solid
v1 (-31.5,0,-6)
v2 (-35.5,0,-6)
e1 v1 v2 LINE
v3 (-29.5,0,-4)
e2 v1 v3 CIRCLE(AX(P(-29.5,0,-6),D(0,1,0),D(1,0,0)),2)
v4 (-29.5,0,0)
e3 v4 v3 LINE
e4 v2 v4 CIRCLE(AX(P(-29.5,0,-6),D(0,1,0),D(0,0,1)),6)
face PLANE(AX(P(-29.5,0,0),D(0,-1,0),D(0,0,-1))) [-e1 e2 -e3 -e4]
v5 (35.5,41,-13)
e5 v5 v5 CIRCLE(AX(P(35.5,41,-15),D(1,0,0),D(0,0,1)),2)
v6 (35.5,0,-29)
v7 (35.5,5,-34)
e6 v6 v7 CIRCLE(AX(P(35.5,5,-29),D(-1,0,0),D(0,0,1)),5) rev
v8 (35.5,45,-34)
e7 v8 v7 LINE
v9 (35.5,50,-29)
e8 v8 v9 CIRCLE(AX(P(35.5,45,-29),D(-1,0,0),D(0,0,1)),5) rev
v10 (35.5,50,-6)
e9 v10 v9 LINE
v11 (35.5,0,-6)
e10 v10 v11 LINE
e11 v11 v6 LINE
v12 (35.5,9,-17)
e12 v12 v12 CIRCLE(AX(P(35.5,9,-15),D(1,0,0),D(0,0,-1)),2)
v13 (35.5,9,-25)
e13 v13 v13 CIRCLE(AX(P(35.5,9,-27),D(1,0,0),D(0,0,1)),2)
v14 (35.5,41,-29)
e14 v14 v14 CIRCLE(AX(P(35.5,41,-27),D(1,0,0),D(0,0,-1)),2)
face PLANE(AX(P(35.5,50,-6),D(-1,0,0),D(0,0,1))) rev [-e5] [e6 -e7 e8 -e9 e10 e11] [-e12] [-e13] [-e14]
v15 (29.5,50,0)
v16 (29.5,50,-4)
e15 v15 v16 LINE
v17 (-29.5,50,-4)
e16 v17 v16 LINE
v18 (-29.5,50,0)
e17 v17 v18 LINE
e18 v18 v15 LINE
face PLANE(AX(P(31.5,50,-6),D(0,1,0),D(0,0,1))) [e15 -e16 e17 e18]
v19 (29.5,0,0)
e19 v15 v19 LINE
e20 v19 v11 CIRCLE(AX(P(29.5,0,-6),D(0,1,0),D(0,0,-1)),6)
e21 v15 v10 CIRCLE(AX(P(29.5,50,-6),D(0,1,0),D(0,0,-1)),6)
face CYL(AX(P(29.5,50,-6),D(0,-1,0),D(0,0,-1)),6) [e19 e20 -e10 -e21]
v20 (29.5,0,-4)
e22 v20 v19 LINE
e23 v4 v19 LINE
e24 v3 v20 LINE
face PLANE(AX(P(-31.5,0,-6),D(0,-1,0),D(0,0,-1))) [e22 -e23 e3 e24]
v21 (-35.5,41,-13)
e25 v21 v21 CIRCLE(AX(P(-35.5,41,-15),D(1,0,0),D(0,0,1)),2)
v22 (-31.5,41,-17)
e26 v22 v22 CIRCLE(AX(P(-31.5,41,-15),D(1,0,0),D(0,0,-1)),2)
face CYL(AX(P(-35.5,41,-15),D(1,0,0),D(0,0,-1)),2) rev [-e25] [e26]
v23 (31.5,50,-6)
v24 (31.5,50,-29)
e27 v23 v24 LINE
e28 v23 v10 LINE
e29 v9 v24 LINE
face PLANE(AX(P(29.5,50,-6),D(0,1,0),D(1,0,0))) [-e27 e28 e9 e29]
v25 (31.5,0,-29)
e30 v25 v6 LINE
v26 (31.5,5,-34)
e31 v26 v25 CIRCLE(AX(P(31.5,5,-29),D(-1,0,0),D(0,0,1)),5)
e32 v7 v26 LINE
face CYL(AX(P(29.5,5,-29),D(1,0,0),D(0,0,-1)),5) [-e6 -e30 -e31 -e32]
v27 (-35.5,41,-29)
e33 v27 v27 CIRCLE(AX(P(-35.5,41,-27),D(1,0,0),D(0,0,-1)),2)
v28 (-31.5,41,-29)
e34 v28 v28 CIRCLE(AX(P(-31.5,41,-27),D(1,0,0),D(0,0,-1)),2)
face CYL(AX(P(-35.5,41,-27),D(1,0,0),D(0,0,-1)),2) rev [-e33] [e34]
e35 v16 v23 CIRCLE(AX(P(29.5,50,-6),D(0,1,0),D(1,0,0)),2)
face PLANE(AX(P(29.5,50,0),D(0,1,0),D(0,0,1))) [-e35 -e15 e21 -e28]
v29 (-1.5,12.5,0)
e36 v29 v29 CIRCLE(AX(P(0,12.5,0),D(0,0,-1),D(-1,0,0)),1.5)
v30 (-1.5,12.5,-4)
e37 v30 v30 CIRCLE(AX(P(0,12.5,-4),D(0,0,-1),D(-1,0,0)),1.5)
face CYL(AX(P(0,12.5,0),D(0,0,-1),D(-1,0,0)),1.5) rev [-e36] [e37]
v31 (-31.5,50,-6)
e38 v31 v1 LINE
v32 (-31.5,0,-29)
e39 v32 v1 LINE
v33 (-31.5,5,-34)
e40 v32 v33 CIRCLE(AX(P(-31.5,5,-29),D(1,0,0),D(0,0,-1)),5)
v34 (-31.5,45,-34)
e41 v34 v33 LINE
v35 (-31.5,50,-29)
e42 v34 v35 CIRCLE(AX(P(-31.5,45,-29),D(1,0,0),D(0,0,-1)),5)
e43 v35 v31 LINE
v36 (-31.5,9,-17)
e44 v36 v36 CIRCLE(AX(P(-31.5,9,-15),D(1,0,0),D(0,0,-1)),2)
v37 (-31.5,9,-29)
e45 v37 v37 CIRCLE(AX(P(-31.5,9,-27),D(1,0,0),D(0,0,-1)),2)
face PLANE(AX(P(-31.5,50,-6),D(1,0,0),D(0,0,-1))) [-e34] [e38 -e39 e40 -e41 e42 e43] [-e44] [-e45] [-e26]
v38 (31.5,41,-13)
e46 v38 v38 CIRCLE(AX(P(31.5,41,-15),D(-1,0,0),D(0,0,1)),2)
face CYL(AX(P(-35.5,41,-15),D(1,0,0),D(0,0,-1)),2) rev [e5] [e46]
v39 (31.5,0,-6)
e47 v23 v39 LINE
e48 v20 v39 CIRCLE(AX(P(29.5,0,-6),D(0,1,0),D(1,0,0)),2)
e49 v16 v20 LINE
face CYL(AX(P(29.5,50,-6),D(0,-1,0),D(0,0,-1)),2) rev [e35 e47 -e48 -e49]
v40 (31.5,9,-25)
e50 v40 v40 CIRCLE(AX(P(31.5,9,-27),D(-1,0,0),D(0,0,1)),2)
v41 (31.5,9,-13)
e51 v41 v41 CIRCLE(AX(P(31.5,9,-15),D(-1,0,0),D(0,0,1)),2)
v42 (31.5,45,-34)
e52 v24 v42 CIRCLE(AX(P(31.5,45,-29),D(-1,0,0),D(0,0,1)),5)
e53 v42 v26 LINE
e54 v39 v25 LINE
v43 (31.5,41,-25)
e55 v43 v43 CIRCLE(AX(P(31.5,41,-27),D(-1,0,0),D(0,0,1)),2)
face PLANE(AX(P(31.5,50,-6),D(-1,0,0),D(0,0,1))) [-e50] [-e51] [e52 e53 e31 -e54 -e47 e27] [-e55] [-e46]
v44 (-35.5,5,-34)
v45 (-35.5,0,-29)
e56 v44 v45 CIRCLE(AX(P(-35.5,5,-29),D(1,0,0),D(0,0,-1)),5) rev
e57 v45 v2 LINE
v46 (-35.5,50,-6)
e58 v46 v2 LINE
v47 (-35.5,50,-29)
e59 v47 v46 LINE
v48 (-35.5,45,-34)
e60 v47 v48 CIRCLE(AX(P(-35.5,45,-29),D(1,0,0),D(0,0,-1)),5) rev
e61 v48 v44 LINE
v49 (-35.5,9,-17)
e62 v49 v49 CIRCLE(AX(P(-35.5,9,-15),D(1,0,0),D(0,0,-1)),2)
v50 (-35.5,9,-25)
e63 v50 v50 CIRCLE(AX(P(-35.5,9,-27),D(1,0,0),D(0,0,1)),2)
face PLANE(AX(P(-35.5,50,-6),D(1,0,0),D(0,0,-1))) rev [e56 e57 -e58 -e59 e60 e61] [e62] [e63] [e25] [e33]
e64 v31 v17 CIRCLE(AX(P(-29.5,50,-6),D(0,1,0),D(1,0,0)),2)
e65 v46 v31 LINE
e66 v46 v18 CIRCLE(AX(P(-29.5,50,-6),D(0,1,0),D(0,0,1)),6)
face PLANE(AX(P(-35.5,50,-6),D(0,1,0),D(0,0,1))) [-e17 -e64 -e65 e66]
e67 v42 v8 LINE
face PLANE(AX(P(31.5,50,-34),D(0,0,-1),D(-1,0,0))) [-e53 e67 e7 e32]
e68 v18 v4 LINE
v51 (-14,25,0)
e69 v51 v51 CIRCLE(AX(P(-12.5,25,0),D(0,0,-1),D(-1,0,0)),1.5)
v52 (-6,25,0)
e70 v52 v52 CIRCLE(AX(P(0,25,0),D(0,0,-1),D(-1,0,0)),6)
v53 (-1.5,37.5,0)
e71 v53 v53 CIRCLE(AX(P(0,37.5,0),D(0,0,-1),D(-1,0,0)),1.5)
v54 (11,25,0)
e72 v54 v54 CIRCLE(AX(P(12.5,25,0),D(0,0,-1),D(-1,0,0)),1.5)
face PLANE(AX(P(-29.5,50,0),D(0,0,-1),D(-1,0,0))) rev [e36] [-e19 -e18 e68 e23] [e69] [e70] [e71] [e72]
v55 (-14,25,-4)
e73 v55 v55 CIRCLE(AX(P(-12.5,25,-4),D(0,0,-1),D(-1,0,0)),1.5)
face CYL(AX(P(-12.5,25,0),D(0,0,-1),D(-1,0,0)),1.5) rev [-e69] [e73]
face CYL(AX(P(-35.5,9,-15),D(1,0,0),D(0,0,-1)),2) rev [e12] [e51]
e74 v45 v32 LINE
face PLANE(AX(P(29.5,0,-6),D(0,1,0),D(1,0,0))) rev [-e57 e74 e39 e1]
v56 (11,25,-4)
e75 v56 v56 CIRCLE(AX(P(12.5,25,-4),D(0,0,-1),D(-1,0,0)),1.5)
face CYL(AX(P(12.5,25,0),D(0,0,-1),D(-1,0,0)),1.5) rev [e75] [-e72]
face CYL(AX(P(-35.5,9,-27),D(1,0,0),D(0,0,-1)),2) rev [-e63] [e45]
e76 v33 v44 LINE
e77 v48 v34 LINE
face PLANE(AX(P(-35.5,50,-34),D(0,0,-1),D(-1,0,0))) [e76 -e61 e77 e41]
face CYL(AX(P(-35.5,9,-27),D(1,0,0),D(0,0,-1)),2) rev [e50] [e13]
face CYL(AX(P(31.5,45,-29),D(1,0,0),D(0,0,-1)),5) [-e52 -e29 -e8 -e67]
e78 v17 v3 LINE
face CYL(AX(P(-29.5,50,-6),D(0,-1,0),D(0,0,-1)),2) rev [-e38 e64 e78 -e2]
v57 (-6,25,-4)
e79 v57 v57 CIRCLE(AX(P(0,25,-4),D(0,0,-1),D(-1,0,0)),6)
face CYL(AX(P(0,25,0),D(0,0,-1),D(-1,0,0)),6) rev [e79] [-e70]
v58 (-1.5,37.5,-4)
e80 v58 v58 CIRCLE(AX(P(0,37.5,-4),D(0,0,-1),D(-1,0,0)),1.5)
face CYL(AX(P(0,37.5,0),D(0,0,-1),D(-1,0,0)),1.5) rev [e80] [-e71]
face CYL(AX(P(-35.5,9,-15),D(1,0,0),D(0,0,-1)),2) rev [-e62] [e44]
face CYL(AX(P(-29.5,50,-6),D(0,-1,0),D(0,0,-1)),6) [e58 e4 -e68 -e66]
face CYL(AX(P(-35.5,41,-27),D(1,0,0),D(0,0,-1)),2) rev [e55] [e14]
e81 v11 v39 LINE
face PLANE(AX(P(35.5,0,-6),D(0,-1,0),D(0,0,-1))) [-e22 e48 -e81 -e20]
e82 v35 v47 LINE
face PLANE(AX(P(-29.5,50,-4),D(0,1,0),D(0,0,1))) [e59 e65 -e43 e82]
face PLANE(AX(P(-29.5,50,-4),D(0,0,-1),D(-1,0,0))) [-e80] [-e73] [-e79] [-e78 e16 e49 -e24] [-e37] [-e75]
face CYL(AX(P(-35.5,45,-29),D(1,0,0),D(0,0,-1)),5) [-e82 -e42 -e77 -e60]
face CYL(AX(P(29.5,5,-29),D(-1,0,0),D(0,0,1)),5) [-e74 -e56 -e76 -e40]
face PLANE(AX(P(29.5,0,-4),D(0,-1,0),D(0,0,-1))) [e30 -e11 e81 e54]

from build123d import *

# Parameters (mm, degrees)
SM_BASE_FLANGE_3_DEPTH = 50
SKETCH_14_R            = 6
SKETCH_14_R_2          = 1.5
CUT_EXTRUDE_1_DEPTH    = 69.26602376
SKETCH_15_R            = 2
CUT_EXTRUDE_2_DEPTH    = 94.257707456
FILLET_1_R             = 5


# Sheet-metal steps are written as plain solids
with BuildPart() as part:
    # 草图1 → 基体-法兰3 (new body)
    with BuildSketch(Plane(origin=(0, 0, 0), x_dir=(1, 0, 0), z_dir=(0, 1, 0))):
        with BuildLine():
            Line((-35.5, 34), (-35.5, 6))
            ThreePointArc((-35.5, 6), (-33.742640687, 1.757359313), (-29.5, 0))
            Line((-29.5, 0), (29.5, 0))
            ThreePointArc((29.5, 0), (33.742640687, 1.757359313), (35.5, 6))
            Line((35.5, 6), (35.5, 34))
            Line((35.5, 34), (31.5, 34))
            Line((31.5, 34), (31.5, 6))
            ThreePointArc((31.5, 6), (30.914213562, 4.585786438), (29.5, 4))
            Line((29.5, 4), (-29.5, 4))
            ThreePointArc((-29.5, 4), (-30.914213562, 4.585786438), (-31.5, 6))
            Line((-31.5, 6), (-31.5, 34))
            Line((-31.5, 34), (-35.5, 34))
        make_face()
    extrude(amount=SM_BASE_FLANGE_3_DEPTH)

    # 草图14 → 切除-拉伸1 (cut, through all)
    with BuildSketch(Plane(origin=(0, 0, -4), x_dir=(-1, 0, 0), z_dir=(0, 0, -1))):
        with Locations((0, 25)):
            Circle(SKETCH_14_R)
        with Locations((0, 37.5)):
            Circle(SKETCH_14_R_2)
        with Locations((12.5, 25)):
            Circle(SKETCH_14_R_2)
        with Locations((0, 12.5)):
            Circle(SKETCH_14_R_2)
        with Locations((-12.5, 25)):
            Circle(SKETCH_14_R_2)
    extrude(amount=-CUT_EXTRUDE_1_DEPTH, mode=Mode.SUBTRACT)

    # 草图15 → 切除-拉伸2 (cut, through all)
    with BuildSketch(Plane(origin=(35.5, 0, 0), x_dir=(0, 0, -1), z_dir=(1, 0, 0))):
        with Locations((15, 9)):
            Circle(SKETCH_15_R)
        with Locations((15, 41)):
            Circle(SKETCH_15_R)
        with Locations((27, 41)):
            Circle(SKETCH_15_R)
        with Locations((27, 9)):
            Circle(SKETCH_15_R)
    extrude(amount=-CUT_EXTRUDE_2_DEPTH, mode=Mode.SUBTRACT)

    # 圆角1
    fillet_1_edges = [part.edges().sort_by_distance(p)[0] for p in [
        (-33.5, 0, -34),
        (33.5, 0, -34),
        (-33.5, 50, -34),
        (33.5, 50, -34),
    ]]
    fillet(fillet_1_edges, radius=FILLET_1_R)


solid = part.part
